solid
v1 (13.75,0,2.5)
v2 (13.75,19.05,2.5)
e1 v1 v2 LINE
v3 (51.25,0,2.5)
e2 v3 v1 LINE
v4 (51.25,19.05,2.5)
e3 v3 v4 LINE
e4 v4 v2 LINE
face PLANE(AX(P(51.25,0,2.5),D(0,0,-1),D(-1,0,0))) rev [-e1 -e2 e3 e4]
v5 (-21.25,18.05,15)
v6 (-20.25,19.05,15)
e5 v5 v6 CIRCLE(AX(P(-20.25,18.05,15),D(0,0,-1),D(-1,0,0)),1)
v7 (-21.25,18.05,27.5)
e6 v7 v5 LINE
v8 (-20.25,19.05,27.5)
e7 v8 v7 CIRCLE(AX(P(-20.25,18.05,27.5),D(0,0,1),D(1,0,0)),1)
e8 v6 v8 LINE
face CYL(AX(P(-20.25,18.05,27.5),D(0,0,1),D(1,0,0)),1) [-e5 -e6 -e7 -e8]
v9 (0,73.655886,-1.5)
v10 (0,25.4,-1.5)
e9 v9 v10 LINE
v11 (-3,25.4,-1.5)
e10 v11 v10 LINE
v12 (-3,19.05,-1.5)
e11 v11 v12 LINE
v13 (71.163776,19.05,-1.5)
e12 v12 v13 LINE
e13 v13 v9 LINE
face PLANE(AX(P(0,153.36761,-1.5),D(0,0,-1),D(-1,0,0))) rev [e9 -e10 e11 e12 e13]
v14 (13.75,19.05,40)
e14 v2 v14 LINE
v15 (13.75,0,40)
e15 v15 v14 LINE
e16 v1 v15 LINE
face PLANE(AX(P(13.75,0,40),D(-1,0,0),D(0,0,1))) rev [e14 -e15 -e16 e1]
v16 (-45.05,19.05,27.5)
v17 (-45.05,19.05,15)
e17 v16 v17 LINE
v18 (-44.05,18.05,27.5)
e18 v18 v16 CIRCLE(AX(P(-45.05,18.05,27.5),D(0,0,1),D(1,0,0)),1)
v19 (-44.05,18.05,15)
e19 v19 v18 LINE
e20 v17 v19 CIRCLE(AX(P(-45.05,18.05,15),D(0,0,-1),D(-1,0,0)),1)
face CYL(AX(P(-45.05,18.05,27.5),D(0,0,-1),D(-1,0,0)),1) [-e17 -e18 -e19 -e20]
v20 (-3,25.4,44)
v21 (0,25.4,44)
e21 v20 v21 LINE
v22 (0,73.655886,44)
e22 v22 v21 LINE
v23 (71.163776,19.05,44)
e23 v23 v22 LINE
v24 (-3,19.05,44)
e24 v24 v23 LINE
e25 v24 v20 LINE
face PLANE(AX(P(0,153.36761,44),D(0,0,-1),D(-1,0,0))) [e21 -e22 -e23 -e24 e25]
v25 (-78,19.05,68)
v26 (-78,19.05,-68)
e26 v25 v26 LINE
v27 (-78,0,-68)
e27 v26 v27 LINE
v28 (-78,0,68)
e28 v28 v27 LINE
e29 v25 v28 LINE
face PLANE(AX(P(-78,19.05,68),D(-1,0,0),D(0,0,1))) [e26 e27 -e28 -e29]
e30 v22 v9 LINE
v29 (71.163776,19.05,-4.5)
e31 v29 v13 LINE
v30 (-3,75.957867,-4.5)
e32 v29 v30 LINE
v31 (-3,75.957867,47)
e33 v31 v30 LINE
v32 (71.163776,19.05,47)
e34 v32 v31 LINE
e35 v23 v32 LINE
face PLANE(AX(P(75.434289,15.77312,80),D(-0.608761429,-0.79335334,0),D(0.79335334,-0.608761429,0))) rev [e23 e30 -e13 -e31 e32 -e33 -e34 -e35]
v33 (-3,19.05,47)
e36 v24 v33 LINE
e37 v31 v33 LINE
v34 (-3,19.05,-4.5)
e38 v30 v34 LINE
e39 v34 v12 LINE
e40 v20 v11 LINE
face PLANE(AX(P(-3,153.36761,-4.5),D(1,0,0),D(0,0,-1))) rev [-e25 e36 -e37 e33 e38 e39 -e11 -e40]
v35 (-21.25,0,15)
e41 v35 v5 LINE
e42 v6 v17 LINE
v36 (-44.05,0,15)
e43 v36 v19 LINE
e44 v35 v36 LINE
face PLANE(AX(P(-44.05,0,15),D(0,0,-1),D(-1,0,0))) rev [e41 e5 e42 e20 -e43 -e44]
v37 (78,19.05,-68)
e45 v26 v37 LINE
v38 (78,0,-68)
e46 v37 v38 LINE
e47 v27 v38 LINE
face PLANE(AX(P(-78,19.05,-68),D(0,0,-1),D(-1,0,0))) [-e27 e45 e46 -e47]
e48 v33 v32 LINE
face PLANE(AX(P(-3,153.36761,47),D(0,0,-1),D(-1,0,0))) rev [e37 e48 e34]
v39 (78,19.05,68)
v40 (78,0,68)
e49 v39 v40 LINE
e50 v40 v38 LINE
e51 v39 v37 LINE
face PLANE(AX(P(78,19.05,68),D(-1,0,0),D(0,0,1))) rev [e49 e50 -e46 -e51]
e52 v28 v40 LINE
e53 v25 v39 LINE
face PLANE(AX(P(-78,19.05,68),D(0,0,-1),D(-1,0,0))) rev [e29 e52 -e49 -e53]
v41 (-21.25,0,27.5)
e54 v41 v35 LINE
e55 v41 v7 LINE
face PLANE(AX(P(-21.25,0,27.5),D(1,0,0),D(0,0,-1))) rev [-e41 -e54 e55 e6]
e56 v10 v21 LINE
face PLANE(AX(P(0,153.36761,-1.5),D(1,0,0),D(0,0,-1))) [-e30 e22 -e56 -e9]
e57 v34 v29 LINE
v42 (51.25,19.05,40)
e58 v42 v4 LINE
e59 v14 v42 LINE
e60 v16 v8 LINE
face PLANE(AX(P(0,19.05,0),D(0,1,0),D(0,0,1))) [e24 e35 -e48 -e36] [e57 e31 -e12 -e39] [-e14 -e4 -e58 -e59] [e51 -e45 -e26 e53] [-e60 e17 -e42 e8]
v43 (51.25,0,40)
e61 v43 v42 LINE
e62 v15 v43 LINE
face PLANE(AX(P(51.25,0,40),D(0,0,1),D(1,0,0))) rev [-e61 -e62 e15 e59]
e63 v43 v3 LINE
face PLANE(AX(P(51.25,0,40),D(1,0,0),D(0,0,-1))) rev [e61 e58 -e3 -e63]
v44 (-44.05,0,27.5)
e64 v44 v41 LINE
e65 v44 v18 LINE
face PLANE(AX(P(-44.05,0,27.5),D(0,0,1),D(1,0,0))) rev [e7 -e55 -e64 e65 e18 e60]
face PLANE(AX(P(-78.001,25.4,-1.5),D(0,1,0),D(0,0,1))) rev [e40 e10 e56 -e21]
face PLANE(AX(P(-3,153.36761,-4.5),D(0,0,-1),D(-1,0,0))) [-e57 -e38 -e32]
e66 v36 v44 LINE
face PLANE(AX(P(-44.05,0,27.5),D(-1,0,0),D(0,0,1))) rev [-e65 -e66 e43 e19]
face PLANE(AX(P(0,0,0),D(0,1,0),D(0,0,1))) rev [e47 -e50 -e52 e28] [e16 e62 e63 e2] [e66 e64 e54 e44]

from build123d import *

# Parameters (mm, degrees)
SKETCH1_W             = 156
SKETCH1_H             = 136
BOSS_EXTRUDE1_DEPTH   = 19.05
SKETCH2_W             = 37.5
SKETCH2_H             = 37.5
CUT_EXTRUDE1_DEPTH    = 106.218356288
SKETCH3_W             = 22.8
SKETCH3_H             = 12.5
CUT_EXTRUDE2_DEPTH    = 106.218356288
FILLET1_R             = 1
BOSS_EXTRUDE2_START   = -4.5
BOSS_EXTRUDE2_DEPTH   = 51.5
BOSS_EXTRUDE2_2_DEPTH = 3
BOSS_EXTRUDE2_START_2 = 44
BOSS_EXTRUDE2_3_DEPTH = 3
CUT_EXTRUDE3_REACH    = 130.365
SKETCH5_W             = 45.5
SKETCH5_H             = 6.35


# Read off the part's stored shape, not the designer's step: Boss-Extrude2
with BuildPart() as part:
    # Sketch1 → Boss-Extrude1 (new body)
    with BuildSketch(Plane(origin=(0, 0, 0), x_dir=(1, 0, 0), z_dir=(0, 1, 0))):
        Rectangle(SKETCH1_W, SKETCH1_H)
    extrude(amount=BOSS_EXTRUDE1_DEPTH)

    # Sketch2 → Cut-Extrude1 (cut, through all)
    with BuildSketch(Plane(origin=(0, 19.05, 0), x_dir=(1, 0, 0), z_dir=(0, 1, 0))):
        with Locations((32.5, -21.25)):
            Rectangle(SKETCH2_W, SKETCH2_H)
    extrude(amount=-CUT_EXTRUDE1_DEPTH, mode=Mode.SUBTRACT)

    # Sketch3 → Cut-Extrude2 (cut, through all)
    with BuildSketch(Plane(origin=(0, 19.05, 0), x_dir=(1, 0, 0), z_dir=(0, 1, 0))):
        with Locations((-32.65, -21.25)):
            Rectangle(SKETCH3_W, SKETCH3_H)
    extrude(amount=-CUT_EXTRUDE2_DEPTH, mode=Mode.SUBTRACT)

    # Fillet1
    fillet1_edges = [part.edges().sort_by_distance(p)[0] for p in [
        (-44.05, 19.05, 21.25),
        (-21.25, 19.05, 21.25),
    ]]
    fillet(fillet1_edges, radius=FILLET1_R)

    # Boss-Extrude2 outline → Boss-Extrude2 (add)
    with BuildSketch(Plane.XY.offset(BOSS_EXTRUDE2_START)):
        Polygon((-3, 19.05), (0, 19.05), (0, 73.655885813), (-3, 75.957866777), align=None)
    extrude(amount=BOSS_EXTRUDE2_DEPTH)

    # Boss-Extrude2 2 outline → Boss-Extrude2 2 (add)
    with BuildSketch(Plane.XY.offset(BOSS_EXTRUDE2_START)):
        Polygon((0, 73.655885813), (0, 19.05), (71.163775898, 19.05), align=None)
    extrude(amount=BOSS_EXTRUDE2_2_DEPTH)

    # Boss-Extrude2 3 outline → Boss-Extrude2 3 (add)
    with BuildSketch(Plane.XY.offset(BOSS_EXTRUDE2_START_2)):
        Polygon((0, 73.655885813), (0, 19.05), (71.163775898, 19.05), align=None)
    extrude(amount=BOSS_EXTRUDE2_3_DEPTH)

    # Sketch5 → Cut-Extrude3 (cut, up to next)
    with BuildSketch(Plane(origin=(0, 0, 0), x_dir=(0, 0, -1), z_dir=(1, 0, 0)), mode=Mode.PRIVATE) as cut_extrude3_sk1:
        with Locations((-21.25, 22.225)):
            Rectangle(SKETCH5_W, SKETCH5_H)
    cut_extrude3_tool1 = extrude(cut_extrude3_sk1.sketch, amount=-CUT_EXTRUDE3_REACH, mode=Mode.PRIVATE) & part.part
    add(cut_extrude3_tool1.solids().sort_by_distance((0, 22.225, 21.25))[0], mode=Mode.SUBTRACT)


solid = part.part
